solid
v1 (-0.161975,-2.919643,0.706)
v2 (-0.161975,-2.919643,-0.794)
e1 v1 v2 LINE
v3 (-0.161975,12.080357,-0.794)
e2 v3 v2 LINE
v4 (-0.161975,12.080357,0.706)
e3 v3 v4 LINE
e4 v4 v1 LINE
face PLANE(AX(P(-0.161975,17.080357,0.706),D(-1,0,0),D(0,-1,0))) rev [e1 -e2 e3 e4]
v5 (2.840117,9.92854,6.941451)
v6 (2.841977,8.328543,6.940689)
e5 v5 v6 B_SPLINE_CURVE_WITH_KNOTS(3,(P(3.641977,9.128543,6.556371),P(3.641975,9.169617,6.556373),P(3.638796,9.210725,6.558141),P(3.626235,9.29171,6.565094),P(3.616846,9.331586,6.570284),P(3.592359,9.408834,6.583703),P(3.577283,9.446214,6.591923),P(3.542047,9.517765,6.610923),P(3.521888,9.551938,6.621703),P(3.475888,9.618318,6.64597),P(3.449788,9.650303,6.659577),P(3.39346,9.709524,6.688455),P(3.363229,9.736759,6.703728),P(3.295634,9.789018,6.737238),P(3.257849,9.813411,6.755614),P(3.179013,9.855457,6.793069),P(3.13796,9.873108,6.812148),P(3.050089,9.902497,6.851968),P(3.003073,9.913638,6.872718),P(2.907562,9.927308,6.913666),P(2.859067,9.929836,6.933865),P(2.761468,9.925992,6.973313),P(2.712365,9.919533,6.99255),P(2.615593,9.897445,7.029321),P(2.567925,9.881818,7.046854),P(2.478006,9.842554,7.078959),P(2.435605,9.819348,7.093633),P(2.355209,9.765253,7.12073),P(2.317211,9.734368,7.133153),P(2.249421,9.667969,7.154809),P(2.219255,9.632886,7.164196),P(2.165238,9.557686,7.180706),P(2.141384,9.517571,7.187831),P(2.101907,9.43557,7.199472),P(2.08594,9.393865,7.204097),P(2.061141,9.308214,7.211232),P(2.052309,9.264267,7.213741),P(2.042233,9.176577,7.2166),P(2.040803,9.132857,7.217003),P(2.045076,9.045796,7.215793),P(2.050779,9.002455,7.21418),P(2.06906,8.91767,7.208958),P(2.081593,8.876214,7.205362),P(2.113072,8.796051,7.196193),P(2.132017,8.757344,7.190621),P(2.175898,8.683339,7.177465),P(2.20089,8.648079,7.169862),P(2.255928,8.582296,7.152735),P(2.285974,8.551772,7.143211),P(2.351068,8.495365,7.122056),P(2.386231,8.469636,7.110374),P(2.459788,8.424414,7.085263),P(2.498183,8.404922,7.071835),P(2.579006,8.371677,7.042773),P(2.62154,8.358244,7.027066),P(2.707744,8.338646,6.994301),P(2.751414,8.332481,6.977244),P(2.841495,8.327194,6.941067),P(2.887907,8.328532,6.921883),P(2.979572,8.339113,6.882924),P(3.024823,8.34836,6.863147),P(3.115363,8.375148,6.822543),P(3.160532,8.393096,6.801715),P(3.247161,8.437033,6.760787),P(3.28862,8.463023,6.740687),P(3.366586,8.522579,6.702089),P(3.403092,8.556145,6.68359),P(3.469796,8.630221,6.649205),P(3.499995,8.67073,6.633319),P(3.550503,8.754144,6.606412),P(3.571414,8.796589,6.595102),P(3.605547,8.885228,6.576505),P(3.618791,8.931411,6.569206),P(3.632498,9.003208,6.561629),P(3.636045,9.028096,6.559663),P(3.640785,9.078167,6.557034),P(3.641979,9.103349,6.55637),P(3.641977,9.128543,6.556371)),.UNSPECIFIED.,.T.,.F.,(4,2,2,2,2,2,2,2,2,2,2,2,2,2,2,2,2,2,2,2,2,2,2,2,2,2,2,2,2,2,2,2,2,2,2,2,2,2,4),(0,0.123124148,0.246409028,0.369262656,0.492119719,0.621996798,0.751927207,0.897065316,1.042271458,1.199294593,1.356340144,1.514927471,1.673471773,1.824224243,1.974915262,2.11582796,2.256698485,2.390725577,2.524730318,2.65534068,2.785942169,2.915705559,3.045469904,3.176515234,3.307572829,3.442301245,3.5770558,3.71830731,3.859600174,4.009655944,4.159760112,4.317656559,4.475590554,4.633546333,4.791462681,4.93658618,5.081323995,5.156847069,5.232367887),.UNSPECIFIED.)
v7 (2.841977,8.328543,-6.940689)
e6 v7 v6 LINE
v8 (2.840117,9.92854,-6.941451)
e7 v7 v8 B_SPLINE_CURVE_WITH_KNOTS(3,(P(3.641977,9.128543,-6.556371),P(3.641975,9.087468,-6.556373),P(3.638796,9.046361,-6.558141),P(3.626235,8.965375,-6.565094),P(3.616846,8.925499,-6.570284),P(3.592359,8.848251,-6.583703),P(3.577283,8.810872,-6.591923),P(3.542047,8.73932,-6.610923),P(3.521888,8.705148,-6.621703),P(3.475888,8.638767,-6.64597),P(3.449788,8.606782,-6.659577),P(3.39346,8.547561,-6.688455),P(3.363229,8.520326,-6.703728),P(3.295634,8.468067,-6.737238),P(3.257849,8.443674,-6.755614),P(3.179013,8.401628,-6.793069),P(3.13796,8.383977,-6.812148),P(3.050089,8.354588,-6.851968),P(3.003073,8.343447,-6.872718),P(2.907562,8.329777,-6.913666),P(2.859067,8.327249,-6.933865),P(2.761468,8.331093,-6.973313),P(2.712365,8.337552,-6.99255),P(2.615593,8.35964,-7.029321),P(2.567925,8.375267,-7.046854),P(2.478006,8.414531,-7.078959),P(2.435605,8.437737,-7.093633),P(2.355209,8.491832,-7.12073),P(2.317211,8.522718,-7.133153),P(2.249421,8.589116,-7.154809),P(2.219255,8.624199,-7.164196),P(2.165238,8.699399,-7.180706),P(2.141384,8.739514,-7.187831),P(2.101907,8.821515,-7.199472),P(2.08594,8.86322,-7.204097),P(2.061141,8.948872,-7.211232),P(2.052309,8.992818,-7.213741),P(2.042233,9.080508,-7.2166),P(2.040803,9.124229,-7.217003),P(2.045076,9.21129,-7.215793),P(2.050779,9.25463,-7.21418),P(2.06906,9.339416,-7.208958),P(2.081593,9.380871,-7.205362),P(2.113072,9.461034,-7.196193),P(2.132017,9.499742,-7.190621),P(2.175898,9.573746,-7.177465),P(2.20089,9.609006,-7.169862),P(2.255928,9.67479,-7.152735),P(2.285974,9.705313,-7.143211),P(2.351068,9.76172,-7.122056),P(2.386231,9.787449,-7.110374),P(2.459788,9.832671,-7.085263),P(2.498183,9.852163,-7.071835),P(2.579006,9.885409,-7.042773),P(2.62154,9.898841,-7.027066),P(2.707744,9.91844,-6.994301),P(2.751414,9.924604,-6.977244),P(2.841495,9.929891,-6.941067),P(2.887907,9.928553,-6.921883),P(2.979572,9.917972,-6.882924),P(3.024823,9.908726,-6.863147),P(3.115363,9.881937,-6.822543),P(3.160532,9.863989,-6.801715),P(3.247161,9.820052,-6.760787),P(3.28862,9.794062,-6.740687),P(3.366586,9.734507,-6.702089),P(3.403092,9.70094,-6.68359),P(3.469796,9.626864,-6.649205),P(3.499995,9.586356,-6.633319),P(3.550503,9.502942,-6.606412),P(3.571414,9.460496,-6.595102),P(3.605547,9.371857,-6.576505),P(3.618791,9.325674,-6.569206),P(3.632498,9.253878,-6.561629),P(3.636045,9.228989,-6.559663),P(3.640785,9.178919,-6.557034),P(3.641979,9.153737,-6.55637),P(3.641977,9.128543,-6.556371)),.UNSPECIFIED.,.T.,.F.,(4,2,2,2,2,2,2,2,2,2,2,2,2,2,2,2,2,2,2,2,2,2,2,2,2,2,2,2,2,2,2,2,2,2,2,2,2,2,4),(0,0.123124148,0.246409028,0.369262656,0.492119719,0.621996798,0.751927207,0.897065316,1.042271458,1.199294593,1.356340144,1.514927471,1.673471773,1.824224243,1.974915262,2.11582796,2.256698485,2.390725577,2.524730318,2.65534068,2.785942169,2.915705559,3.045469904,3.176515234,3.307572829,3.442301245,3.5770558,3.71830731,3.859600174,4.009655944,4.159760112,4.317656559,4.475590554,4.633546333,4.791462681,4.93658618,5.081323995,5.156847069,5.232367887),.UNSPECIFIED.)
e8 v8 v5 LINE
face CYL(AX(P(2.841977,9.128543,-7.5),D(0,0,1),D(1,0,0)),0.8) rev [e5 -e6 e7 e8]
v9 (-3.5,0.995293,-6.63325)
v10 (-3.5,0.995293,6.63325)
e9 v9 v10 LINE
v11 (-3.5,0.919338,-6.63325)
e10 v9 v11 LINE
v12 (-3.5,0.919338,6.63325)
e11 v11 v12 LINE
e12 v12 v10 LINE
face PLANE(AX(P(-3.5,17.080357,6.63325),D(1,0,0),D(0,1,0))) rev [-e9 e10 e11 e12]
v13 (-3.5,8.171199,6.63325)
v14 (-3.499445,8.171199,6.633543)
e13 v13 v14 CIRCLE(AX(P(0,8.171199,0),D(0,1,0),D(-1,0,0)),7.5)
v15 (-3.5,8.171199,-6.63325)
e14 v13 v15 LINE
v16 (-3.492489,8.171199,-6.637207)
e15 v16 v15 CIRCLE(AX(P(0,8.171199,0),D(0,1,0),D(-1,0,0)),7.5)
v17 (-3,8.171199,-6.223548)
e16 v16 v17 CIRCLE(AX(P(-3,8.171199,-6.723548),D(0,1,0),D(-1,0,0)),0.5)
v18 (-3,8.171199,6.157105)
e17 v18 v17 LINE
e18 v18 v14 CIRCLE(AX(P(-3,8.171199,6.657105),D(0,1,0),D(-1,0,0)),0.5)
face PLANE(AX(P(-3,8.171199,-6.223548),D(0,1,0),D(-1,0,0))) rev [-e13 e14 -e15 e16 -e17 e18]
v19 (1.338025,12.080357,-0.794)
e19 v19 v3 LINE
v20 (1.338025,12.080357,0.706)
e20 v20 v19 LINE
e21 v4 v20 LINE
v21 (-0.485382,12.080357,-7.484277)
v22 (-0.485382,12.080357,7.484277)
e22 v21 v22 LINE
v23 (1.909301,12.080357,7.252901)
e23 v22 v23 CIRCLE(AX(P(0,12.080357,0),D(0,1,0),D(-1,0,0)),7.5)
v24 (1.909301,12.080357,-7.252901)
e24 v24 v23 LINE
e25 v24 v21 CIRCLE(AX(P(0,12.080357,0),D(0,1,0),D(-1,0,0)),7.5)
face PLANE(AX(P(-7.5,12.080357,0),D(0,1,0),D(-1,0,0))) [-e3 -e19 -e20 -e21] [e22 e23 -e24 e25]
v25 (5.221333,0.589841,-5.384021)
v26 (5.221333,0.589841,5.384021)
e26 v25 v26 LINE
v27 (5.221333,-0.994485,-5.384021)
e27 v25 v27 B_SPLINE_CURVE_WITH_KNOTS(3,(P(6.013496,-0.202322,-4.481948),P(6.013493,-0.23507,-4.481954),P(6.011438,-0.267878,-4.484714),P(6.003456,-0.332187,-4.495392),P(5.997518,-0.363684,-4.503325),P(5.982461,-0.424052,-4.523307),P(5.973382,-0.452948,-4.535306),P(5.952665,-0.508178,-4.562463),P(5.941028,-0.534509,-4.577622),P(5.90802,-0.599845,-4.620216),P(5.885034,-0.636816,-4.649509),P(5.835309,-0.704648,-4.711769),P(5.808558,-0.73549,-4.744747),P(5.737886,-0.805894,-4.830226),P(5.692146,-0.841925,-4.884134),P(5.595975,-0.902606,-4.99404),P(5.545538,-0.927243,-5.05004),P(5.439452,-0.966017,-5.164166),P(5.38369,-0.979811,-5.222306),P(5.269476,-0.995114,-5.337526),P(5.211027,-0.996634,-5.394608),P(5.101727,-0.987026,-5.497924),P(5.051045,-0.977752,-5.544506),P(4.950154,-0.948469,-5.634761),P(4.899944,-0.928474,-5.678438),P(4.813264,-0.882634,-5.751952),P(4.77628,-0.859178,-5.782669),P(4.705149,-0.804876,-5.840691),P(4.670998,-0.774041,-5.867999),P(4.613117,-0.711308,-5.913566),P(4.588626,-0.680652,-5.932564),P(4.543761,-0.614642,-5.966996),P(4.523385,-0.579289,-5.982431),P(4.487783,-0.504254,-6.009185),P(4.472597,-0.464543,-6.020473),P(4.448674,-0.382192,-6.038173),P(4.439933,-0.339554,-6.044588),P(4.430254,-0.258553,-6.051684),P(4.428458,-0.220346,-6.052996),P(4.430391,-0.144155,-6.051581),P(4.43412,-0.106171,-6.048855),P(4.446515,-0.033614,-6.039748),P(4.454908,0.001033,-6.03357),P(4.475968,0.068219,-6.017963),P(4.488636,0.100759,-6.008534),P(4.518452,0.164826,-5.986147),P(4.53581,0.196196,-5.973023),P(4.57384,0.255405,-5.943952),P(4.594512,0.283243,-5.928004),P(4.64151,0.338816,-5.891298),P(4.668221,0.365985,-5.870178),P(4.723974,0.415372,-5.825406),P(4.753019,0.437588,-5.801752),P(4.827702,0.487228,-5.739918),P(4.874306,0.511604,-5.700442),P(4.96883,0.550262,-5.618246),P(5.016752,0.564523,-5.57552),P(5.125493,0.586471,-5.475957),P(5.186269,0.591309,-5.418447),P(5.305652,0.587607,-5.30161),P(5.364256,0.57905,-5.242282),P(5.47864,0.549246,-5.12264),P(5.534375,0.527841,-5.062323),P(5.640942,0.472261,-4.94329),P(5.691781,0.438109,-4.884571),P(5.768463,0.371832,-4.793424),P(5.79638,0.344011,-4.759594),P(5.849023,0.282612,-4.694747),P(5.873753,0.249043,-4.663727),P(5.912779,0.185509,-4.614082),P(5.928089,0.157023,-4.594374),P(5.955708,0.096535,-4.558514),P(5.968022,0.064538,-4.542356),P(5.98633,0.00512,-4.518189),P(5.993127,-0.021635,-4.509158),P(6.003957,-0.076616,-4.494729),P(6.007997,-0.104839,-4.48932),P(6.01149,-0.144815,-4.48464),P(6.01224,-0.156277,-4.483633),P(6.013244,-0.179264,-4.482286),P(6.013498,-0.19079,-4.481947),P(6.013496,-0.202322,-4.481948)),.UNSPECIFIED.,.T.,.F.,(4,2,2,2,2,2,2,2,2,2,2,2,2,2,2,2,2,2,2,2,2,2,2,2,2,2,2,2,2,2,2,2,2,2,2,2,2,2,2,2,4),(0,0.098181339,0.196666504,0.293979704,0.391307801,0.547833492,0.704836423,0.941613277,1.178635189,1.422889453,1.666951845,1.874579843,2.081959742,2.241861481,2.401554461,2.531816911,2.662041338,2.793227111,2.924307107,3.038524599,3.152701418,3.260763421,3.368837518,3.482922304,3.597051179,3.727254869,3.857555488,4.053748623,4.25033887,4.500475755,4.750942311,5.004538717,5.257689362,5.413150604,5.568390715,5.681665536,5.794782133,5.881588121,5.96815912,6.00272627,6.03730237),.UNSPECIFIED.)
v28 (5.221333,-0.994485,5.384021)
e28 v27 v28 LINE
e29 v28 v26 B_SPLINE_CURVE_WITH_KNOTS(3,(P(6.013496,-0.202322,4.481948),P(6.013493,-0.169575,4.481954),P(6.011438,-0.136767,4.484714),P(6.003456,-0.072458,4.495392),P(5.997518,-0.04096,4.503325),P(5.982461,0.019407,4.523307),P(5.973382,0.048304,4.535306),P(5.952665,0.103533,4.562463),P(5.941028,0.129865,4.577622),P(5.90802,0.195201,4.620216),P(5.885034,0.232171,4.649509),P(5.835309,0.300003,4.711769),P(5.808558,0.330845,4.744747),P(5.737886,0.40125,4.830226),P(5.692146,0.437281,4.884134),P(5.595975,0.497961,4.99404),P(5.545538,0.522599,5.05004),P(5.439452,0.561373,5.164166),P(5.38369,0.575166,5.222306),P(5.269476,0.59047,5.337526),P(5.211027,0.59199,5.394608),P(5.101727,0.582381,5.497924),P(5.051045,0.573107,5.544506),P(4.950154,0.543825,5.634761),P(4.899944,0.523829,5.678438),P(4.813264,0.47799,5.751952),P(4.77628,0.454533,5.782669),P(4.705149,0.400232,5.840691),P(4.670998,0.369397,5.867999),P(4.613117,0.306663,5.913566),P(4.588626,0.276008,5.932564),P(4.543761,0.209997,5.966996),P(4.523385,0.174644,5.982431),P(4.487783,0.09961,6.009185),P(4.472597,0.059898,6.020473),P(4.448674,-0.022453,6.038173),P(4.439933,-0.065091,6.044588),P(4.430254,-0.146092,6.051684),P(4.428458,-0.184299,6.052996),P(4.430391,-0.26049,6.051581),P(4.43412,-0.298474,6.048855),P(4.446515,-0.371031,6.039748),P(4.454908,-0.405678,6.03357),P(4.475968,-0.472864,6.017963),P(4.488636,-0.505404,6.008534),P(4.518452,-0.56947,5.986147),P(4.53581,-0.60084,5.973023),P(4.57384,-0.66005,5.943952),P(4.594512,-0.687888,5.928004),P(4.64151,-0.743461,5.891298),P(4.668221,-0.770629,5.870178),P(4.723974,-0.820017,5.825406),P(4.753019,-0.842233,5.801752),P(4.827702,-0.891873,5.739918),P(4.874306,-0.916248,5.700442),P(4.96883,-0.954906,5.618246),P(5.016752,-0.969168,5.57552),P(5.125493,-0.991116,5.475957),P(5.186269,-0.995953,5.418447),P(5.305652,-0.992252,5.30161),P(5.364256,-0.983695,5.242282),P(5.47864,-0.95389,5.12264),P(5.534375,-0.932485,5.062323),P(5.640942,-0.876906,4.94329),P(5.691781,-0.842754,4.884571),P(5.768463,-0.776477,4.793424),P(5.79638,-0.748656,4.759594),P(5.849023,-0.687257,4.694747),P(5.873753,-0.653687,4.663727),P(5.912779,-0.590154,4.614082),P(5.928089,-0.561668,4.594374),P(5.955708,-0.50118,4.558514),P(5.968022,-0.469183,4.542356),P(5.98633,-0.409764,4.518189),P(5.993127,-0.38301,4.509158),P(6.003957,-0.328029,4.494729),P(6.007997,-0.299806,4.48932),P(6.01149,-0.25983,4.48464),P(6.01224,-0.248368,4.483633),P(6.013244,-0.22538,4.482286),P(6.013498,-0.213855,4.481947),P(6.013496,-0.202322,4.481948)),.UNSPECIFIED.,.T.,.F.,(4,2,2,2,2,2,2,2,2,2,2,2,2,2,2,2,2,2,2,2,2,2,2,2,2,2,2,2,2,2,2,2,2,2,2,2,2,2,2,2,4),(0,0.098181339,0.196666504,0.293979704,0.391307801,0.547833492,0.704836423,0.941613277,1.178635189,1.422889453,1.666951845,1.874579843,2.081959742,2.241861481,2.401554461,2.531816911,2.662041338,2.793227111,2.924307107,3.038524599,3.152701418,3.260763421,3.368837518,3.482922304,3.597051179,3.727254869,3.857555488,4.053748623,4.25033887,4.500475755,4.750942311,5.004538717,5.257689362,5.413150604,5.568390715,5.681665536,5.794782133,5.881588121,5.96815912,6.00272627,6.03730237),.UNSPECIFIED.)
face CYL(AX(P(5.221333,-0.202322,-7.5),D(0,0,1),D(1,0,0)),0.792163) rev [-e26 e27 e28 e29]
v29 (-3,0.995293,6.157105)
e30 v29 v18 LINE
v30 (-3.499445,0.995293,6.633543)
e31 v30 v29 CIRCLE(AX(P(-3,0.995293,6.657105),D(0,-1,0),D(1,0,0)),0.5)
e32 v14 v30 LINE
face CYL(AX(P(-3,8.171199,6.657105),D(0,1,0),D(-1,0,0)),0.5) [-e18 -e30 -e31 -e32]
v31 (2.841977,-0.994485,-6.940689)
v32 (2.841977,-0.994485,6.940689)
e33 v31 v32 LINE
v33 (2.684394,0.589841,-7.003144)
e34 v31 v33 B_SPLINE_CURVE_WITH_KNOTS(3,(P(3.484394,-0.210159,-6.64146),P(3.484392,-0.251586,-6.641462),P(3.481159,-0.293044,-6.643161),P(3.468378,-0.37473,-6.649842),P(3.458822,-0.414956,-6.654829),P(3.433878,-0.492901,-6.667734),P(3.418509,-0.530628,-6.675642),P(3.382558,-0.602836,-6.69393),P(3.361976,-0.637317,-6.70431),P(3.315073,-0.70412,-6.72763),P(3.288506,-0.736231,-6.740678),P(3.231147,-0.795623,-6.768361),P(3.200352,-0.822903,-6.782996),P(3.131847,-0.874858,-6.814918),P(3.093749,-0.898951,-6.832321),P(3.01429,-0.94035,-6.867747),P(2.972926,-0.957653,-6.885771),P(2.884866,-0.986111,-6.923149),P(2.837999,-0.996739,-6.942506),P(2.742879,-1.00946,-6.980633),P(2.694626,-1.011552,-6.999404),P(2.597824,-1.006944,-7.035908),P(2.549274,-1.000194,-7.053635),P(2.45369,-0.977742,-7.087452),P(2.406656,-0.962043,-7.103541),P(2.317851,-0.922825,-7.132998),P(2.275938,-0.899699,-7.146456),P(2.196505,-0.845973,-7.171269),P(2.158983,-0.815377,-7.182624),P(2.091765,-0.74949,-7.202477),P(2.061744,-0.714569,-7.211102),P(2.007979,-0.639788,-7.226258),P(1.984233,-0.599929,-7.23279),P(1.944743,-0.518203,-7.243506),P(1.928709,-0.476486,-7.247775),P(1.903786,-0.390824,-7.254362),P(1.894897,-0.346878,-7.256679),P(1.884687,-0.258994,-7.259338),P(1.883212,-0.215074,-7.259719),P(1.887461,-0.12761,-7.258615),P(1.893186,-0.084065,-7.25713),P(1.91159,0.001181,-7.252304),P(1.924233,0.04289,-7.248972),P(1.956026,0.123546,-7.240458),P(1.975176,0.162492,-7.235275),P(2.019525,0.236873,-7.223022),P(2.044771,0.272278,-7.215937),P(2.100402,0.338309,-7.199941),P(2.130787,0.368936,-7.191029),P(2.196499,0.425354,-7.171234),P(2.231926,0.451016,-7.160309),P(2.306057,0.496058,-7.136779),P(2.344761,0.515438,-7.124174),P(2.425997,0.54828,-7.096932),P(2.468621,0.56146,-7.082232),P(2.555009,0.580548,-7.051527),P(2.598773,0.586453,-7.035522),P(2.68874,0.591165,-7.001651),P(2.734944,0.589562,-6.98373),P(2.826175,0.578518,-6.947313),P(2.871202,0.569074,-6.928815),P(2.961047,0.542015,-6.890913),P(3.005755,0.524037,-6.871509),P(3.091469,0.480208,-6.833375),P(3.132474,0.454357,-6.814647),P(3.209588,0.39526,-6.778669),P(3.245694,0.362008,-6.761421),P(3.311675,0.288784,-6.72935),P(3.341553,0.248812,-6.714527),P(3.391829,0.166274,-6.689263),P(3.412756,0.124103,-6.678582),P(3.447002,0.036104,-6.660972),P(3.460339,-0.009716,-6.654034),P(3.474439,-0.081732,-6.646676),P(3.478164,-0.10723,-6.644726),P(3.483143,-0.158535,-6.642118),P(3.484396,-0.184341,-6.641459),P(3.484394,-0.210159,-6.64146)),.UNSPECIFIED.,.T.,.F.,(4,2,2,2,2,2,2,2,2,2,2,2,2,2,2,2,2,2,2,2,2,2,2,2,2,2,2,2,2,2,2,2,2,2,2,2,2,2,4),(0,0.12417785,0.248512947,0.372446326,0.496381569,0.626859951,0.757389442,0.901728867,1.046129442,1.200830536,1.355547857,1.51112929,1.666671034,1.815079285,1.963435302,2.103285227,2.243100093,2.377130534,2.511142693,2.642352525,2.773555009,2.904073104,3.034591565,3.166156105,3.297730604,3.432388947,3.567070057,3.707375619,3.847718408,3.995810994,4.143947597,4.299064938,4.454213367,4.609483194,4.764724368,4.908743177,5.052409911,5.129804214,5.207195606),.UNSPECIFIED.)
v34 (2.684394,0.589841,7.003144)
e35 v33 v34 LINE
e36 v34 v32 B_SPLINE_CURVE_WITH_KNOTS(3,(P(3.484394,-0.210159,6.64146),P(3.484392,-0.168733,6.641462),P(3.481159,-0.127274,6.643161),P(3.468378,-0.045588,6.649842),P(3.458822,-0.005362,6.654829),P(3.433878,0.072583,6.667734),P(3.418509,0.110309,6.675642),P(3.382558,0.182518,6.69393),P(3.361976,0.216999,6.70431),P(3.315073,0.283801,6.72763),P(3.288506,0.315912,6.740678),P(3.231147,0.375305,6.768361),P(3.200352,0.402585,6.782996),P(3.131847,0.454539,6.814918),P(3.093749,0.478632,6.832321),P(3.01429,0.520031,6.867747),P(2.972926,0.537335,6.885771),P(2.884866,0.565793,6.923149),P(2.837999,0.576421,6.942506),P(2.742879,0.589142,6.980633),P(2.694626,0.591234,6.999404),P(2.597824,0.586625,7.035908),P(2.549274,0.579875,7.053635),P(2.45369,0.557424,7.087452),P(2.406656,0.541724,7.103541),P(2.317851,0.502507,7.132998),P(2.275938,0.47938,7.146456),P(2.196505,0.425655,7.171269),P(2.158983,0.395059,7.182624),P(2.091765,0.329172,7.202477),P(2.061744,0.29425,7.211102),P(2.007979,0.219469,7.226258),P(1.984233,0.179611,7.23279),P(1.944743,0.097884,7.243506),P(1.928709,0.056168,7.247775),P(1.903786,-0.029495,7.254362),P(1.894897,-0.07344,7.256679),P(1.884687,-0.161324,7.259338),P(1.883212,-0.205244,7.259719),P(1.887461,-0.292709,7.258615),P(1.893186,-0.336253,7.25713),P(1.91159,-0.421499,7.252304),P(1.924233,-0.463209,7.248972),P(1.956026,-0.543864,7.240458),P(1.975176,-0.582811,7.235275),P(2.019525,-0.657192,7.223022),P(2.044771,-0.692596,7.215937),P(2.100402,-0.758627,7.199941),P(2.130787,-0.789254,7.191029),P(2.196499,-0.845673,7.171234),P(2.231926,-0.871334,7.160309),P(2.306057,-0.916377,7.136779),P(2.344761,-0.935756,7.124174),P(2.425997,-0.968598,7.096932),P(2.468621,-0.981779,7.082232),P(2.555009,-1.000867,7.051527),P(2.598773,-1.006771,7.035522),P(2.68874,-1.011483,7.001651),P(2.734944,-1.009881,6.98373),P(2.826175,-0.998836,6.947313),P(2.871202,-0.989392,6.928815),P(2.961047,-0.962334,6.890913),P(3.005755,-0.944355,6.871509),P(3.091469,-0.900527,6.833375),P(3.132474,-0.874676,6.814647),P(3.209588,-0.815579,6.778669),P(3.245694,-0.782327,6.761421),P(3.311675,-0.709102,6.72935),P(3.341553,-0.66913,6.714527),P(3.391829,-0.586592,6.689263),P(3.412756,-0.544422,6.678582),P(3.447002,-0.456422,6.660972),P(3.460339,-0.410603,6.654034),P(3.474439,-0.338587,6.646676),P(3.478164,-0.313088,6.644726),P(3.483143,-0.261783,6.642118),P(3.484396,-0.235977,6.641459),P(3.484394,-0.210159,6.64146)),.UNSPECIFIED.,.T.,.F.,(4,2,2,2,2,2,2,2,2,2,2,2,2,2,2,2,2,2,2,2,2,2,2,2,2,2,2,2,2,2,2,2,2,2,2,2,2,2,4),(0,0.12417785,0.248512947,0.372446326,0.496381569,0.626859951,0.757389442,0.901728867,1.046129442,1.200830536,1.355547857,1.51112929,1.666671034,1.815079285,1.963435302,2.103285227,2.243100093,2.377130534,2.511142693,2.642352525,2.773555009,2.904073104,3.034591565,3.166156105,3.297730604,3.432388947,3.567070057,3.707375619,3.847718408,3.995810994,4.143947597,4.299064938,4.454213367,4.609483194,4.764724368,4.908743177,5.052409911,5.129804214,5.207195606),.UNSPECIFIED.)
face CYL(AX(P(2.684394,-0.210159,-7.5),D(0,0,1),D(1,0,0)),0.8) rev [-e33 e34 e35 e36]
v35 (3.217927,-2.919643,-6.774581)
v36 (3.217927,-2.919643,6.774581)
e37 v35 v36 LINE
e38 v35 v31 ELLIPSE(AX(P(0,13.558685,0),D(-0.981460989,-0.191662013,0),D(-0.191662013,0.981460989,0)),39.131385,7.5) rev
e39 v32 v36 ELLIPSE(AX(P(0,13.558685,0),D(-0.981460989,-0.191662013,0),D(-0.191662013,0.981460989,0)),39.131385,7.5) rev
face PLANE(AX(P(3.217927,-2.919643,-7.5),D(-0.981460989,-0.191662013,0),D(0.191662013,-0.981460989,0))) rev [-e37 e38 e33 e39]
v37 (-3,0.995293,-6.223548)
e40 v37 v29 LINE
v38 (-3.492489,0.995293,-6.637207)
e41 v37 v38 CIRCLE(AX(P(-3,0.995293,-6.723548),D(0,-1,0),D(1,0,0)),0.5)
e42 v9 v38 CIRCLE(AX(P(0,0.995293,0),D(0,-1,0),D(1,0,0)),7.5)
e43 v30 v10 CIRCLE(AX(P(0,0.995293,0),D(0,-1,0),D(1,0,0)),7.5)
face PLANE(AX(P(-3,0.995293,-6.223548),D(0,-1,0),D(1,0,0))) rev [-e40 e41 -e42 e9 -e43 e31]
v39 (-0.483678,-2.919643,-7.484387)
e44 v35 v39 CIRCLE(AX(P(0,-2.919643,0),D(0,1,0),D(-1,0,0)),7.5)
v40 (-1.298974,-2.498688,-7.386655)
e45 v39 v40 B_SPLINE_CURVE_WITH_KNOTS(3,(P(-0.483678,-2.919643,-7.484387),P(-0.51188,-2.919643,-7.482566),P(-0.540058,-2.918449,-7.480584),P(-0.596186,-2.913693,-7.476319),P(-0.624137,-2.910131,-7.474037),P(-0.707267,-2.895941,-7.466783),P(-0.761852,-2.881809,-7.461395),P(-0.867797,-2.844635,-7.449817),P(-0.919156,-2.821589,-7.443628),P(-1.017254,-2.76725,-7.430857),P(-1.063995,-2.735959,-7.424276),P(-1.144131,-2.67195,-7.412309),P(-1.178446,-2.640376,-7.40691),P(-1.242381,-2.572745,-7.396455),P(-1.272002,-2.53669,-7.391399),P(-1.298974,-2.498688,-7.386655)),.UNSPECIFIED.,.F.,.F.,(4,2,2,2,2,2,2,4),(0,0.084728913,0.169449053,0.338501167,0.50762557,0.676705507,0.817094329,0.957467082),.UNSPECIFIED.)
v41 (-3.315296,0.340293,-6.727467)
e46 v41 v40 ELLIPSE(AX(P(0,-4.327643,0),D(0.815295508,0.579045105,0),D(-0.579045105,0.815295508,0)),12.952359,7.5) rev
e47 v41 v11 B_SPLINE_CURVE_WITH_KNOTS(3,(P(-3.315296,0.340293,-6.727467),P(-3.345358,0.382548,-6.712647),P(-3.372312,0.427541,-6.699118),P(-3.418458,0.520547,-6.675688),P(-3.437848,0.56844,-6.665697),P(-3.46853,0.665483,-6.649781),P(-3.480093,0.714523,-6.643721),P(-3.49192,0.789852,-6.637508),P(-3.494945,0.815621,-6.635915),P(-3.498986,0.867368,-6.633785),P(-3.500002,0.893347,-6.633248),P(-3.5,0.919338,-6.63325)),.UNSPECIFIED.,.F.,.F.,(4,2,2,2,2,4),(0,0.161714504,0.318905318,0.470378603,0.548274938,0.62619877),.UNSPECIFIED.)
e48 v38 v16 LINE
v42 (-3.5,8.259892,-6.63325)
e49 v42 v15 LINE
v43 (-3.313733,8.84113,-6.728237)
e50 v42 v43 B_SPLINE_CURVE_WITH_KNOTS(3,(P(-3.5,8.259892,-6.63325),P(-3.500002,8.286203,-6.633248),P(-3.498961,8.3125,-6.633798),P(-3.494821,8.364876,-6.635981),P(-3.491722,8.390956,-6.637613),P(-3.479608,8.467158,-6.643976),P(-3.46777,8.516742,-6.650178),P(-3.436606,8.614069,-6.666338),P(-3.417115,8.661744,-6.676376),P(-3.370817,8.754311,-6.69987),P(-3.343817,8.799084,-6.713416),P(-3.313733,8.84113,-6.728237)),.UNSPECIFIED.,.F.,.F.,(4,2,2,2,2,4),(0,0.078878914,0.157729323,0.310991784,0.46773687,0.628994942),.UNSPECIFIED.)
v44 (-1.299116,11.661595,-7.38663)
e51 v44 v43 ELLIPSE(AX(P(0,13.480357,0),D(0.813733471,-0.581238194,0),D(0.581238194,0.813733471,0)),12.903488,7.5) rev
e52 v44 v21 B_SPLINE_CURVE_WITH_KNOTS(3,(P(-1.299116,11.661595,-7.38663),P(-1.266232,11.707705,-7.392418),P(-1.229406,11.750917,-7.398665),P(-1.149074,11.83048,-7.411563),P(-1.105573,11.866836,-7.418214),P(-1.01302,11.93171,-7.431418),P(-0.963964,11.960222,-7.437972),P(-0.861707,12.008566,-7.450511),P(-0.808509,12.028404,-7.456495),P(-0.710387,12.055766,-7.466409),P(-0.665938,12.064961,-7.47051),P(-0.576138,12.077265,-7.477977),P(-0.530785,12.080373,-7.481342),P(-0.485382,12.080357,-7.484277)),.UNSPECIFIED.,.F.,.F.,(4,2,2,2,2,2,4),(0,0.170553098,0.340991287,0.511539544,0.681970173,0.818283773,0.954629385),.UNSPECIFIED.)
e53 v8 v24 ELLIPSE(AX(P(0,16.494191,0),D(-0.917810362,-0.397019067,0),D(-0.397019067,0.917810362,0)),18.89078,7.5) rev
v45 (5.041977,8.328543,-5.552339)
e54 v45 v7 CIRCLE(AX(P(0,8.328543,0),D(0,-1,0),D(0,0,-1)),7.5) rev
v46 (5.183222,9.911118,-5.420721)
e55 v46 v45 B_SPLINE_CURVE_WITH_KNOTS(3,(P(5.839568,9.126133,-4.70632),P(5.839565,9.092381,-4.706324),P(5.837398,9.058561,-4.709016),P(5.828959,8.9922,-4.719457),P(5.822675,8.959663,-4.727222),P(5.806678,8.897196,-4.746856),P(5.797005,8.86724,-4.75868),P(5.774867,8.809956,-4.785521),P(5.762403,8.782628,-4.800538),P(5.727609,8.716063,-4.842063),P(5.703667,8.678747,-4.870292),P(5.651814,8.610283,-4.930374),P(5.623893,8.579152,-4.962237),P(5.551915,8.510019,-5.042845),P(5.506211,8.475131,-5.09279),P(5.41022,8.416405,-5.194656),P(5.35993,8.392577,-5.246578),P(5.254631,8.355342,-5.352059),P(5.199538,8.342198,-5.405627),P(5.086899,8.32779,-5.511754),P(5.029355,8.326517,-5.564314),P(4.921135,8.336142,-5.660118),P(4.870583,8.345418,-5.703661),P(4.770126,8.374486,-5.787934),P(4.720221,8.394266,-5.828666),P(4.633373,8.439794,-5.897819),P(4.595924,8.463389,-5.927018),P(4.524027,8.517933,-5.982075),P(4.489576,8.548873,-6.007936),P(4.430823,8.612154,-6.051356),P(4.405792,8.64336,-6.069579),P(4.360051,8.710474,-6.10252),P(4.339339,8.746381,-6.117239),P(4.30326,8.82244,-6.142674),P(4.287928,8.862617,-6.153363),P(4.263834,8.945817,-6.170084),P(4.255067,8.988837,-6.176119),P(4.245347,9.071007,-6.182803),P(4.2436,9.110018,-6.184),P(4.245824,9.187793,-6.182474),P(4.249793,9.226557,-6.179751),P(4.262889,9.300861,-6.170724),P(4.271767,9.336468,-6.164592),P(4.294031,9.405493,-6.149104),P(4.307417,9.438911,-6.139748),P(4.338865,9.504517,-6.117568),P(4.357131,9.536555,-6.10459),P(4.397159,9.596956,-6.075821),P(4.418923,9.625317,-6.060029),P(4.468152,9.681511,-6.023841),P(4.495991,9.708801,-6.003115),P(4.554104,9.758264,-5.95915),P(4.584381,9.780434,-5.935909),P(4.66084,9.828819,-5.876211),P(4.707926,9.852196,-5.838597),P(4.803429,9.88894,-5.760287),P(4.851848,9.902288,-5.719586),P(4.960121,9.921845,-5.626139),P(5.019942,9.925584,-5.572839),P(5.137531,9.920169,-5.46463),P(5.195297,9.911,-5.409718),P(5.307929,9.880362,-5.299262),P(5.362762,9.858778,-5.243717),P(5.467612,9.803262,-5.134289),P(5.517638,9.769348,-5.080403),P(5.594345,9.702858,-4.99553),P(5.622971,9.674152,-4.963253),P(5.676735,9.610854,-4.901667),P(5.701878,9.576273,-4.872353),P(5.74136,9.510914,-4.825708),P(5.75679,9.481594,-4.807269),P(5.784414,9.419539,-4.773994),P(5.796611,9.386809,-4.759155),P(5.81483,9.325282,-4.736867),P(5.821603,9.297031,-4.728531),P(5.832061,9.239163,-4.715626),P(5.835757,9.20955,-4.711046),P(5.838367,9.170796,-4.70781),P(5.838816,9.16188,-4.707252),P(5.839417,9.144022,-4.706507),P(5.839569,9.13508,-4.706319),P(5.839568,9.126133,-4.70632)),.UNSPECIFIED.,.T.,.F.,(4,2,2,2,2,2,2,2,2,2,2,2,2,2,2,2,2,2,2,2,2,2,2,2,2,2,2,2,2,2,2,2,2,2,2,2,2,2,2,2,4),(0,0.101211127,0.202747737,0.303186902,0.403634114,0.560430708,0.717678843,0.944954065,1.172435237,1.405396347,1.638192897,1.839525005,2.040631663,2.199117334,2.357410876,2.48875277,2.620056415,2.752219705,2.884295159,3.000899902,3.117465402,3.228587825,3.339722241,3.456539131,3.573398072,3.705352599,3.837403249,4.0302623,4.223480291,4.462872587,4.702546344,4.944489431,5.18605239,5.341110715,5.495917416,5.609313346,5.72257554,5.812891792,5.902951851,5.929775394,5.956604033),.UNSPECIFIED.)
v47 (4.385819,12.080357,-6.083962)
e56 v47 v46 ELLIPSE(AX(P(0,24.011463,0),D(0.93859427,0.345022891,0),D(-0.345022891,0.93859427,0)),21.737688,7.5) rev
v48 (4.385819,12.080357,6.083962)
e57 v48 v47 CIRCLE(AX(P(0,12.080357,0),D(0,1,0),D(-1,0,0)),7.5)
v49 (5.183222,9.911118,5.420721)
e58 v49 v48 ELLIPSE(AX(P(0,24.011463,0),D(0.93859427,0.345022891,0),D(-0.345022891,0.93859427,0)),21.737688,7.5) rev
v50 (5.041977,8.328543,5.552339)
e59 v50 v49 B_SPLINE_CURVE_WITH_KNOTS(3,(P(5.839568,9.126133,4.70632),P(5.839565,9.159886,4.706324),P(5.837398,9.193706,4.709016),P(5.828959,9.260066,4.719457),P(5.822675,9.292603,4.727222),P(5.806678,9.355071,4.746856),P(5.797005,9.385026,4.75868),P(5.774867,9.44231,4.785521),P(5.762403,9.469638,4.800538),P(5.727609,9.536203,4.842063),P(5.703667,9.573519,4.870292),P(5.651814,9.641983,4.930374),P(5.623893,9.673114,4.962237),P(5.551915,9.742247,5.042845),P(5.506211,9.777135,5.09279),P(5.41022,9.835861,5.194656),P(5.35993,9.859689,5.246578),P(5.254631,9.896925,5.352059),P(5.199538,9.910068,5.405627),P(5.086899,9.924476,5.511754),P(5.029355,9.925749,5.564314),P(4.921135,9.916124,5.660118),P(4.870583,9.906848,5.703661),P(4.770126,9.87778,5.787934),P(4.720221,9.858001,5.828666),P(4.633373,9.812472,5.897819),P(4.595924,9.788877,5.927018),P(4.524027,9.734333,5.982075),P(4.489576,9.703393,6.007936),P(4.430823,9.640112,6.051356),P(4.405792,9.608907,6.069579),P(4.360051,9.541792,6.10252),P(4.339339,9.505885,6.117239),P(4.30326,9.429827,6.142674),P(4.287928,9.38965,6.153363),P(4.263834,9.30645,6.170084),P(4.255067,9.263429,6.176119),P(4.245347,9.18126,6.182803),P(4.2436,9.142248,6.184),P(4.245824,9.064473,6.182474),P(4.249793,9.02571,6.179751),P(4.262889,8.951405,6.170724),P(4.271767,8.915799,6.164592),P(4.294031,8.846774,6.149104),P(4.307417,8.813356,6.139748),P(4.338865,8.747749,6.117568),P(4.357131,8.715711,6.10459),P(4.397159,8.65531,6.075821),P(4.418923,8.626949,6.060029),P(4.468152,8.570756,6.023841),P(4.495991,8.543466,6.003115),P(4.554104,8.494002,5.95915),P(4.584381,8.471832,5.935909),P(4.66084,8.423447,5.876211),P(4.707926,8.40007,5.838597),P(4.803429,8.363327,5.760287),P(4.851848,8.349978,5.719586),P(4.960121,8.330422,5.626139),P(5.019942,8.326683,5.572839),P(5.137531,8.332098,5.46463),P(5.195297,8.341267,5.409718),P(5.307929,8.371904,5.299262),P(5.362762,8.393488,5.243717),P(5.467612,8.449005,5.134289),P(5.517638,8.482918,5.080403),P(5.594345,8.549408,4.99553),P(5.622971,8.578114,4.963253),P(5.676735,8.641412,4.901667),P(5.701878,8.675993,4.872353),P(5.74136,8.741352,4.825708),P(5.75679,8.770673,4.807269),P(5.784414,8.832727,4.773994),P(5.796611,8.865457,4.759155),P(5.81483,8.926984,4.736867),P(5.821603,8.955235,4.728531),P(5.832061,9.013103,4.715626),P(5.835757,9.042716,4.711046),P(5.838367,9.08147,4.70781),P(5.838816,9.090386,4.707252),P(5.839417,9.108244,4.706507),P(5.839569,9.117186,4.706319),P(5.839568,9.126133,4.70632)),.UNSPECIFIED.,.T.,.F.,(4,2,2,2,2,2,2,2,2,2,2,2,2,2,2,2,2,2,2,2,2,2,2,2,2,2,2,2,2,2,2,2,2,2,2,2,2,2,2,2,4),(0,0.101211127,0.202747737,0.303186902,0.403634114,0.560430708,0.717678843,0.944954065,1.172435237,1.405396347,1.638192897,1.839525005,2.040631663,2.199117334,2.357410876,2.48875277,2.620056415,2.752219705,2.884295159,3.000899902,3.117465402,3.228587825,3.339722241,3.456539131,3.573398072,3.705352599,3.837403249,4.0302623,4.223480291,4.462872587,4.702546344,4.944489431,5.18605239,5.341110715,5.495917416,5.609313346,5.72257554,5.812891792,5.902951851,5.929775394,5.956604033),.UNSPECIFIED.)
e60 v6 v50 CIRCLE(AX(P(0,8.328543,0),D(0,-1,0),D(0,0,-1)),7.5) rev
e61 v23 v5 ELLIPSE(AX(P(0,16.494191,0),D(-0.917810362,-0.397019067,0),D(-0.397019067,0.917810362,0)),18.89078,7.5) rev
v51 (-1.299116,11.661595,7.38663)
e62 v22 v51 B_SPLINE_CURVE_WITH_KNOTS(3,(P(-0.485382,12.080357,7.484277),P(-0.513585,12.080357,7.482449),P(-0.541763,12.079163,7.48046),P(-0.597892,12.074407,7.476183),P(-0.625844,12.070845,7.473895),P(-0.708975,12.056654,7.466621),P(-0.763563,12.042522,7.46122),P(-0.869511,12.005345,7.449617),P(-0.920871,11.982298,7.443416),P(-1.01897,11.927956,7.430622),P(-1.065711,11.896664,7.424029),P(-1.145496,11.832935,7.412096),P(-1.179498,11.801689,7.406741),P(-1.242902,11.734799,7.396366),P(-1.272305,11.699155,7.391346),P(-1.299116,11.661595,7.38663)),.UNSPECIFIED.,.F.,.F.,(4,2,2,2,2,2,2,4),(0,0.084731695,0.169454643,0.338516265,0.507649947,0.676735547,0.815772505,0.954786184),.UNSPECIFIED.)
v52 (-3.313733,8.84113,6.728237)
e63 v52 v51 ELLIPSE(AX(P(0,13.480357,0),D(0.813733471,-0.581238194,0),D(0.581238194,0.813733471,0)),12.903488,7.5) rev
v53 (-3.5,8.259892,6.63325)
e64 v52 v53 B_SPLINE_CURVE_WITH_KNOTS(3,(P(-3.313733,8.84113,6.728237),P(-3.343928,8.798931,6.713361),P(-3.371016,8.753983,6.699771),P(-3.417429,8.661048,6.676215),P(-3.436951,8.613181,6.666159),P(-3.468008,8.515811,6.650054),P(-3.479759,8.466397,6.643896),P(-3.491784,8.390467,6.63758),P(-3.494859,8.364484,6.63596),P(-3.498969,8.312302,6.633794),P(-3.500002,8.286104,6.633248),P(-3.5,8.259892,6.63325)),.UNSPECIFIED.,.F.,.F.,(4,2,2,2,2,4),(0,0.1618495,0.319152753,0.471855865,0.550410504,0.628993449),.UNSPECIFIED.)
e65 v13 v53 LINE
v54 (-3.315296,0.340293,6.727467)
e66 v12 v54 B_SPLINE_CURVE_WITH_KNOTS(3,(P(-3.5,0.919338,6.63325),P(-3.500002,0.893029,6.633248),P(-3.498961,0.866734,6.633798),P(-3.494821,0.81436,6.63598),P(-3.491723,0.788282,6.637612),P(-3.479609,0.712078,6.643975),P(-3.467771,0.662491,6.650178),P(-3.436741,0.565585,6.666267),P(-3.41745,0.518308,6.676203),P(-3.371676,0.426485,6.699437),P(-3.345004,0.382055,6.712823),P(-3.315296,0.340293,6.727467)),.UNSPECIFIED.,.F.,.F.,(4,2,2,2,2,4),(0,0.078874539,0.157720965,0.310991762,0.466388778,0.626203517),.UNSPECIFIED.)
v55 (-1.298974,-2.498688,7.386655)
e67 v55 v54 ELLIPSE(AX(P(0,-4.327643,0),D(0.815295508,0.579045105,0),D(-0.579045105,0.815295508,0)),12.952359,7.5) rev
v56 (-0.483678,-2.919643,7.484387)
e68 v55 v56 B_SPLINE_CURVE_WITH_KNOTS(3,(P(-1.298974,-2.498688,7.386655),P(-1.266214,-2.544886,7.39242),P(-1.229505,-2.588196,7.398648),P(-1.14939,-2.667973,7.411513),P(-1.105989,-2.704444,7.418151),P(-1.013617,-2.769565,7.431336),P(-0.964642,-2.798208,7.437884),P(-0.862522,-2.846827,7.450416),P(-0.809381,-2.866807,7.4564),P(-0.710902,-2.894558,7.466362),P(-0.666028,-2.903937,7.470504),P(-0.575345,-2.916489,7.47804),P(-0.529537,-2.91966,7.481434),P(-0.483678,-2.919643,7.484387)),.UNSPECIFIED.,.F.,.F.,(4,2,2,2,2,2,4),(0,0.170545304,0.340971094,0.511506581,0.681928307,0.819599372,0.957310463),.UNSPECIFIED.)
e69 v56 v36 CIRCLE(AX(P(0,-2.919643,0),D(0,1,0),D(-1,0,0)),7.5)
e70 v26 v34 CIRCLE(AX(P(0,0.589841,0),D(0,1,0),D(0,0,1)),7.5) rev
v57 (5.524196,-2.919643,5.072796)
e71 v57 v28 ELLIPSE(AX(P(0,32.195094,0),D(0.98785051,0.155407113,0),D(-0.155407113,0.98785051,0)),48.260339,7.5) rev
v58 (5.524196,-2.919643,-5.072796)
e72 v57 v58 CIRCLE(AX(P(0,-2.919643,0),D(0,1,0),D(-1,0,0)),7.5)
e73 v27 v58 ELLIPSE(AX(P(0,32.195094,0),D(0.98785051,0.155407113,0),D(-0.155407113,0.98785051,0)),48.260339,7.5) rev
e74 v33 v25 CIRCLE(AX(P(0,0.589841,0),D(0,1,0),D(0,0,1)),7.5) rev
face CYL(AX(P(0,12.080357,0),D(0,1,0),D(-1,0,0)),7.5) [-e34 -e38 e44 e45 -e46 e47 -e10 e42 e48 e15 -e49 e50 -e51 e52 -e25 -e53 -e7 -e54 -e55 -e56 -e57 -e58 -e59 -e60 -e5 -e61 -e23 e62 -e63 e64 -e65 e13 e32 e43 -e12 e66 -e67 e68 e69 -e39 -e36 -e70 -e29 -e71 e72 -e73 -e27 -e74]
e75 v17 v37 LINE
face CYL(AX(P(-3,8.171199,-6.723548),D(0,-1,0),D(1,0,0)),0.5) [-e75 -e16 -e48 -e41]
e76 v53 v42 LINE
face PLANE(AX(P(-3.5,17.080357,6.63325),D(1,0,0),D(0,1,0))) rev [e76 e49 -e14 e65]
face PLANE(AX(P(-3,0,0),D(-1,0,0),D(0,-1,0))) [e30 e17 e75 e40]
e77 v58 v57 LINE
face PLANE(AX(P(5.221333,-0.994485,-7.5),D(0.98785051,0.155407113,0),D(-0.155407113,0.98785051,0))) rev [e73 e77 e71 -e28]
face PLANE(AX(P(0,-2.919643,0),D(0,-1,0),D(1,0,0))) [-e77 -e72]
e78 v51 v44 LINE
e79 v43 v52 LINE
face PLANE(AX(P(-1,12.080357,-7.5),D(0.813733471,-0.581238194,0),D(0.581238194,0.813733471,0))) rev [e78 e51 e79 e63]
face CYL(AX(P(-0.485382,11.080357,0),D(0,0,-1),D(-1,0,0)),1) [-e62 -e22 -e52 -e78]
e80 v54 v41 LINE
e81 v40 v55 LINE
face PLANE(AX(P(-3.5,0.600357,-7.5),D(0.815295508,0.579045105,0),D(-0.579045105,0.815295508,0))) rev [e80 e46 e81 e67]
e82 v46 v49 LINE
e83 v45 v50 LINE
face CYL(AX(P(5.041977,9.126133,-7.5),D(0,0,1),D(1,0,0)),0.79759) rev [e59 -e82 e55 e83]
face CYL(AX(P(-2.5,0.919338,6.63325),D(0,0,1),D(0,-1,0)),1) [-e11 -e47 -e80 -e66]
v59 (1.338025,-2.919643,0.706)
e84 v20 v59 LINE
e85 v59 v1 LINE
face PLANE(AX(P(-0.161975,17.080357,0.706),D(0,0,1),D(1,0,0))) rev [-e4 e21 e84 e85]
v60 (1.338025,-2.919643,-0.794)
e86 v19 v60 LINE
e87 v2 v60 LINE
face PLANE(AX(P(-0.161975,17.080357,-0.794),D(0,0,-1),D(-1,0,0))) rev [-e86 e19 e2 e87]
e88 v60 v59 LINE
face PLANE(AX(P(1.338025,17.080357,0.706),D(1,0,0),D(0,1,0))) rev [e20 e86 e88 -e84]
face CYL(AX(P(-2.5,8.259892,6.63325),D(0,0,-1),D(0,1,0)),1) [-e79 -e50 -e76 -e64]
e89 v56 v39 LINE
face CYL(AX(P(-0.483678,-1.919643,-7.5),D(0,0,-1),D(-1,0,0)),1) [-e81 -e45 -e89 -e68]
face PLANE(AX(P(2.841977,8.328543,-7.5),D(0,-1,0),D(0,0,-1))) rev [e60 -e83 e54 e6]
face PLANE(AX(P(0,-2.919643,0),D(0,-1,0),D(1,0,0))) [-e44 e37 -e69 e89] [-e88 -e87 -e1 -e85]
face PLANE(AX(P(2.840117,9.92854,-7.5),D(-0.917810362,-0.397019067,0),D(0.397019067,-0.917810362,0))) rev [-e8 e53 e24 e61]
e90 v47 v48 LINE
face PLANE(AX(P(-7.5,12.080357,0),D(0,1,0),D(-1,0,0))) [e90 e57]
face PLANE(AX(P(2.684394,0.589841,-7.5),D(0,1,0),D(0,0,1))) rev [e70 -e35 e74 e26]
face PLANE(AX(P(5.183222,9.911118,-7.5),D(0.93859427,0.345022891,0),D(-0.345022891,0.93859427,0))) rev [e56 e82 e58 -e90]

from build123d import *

# Parameters (mm, degrees)
SKETCH1_W               = 7.5
SKETCH1_H               = 15
CUT_EXTRUDE1_START      = -20
CUT_EXTRUDE1_DEPTH      = 20
SKETCH4_W               = 1.5
SKETCH4_H               = 1.5
CUT_EXTRUDE2_DEPTH      = 20
CUT_EXTRUDE3_DEPTH      = 17.075914552
CUT_EXTRUDE3_DEPTH_BACK = 17.075914552
CUT_EXTRUDE4_DEPTH      = 17.075914721
CUT_EXTRUDE4_DEPTH_BACK = 17.075914721
SKETCH8_W               = 12.380653288
SKETCH8_H               = 7.175906378
CUT_EXTRUDE5_DEPTH      = 0.5
FILLET2_R               = 1
FILLET5_R               = 0.5


with BuildPart() as part:
    # Sketch1 → Revolve1 (revolve)
    with BuildSketch(Plane.XY):
        with Locations((-3.75, 4.580357143)):
            Rectangle(SKETCH1_W, SKETCH1_H)
    revolve(axis=Axis((0, 12.080357143, 0), (0, -1, 0)))

    # Sketch2 → Cut-Extrude1 (cut)
    with BuildSketch(Plane.XZ.offset(2.919642857).offset(CUT_EXTRUDE1_START)):
        with BuildLine():
            Line((-3.5, 6.633249581), (-3.5, -6.633249581))
            ThreePointArc((-3.5, -6.633249581), (-7.5, 0), (-3.5, 6.633249581))
        make_face()
    extrude(amount=CUT_EXTRUDE1_DEPTH, mode=Mode.SUBTRACT)

    # Sketch4 → Cut-Extrude2 (cut)
    with BuildSketch(Plane.XZ.offset(2.919642857)):
        with Locations((0.588025285, -0.043999564)):
            Rectangle(SKETCH4_W, SKETCH4_H)
    extrude(amount=-CUT_EXTRUDE2_DEPTH, mode=Mode.SUBTRACT)

    # Sketch6 → Cut-Extrude3 (cut, two sides: drawn at the far end of the back side and taken through both)
    with BuildSketch(Plane.XY.offset(-CUT_EXTRUDE3_DEPTH_BACK)):
        with BuildLine():
            Line((2.684394406, 0.589840789), (5.221333223, 0.589840789))
            ThreePointArc((5.221333223, 0.589840789), (6.01349632, -0.202322309), (5.221333223, -0.994485407))
            Line((5.221333223, -0.994485407), (5.524196013, -2.919642857))
            Line((5.524196013, -2.919642857), (3.217926739, -2.919642857))
            Line((3.217926739, -2.919642857), (2.84197746, -0.994485407))
            ThreePointArc((2.84197746, -0.994485407), (2.755326831, -1.007008376), (2.667826658, -1.009987637))
            ThreePointArc((2.667826658, -1.009987637), (1.8844373, -0.201874894), (2.684394406, 0.589840789))
        make_face()
        with BuildLine():
            Line((2.84197746, 8.328542626), (5.04197746, 8.328542626))
            ThreePointArc((5.04197746, 8.328542626), (5.761372587, 8.781718764), (5.663273755, 9.626274613))
            ThreePointArc((5.663273755, 9.626274613), (5.448979722, 9.81206297), (5.183221531, 9.91111765))
            Line((5.183221531, 9.91111765), (4.385819176, 12.080357143))
            Line((4.385819176, 12.080357143), (1.90930103, 12.080357143))
            Line((1.90930103, 12.080357143), (2.840116682, 9.928540462))
            ThreePointArc((2.840116682, 9.928540462), (2.515101589, 9.858715321), (2.24652895, 9.662809481))
            ThreePointArc((2.24652895, 9.662809481), (2.111425106, 8.802516157), (2.84197746, 8.328542626))
        make_face()
    extrude(amount=CUT_EXTRUDE3_DEPTH + CUT_EXTRUDE3_DEPTH_BACK, mode=Mode.SUBTRACT)

    # Sketch7 → Cut-Extrude4 (cut, two sides: drawn at the far end of the back side and taken through both)
    with BuildSketch(Plane.XY.offset(-CUT_EXTRUDE4_DEPTH_BACK)):
        Polygon((-3.5, 0.600357143), (-3.5, -2.919642857), (-1, -2.919642857), align=None)
        Polygon((-3.5, 12.080357143), (-3.5, 8.580357143), (-1, 12.080357143), align=None)
    extrude(amount=CUT_EXTRUDE4_DEPTH + CUT_EXTRUDE4_DEPTH_BACK, mode=Mode.SUBTRACT)

    # Sketch8 → Cut-Extrude5 (cut)
    with BuildSketch(Plane.ZY.offset(3.5)):
        with Locations((-0.033221789, 4.583246246)):
            Rectangle(SKETCH8_W, SKETCH8_H)
    extrude(amount=-CUT_EXTRUDE5_DEPTH, mode=Mode.SUBTRACT)

    # Fillet2
    fillet2_edges = [part.edges().sort_by_distance(p)[0] for p in [
        (-1, 12.080357143, 0),
        (-3.5, 8.580357143, 0),
        (-1, -2.919642857, 0),
        (-3.5, 0.600357143, 0),
    ]]
    fillet(fillet2_edges, radius=FILLET2_R)

    # Fillet5
    # the kernel refuses this fillet: 0.5 mm, written as the material it takes off along each edge
    with BuildSketch(Plane(origin=(-3.5, 8.171199435, 6.157104855), x_dir=(0, 0, 1), z_dir=(0, -1, 0)), Plane(origin=(-3.5, 0.995293057, -6.223548433), x_dir=(0, 0, -1), z_dir=(0, 1, 0))) as fillet5_piece_1:
        with BuildLine():
            CenterArc((FILLET5_R, -FILLET5_R), FILLET5_R, 90, 90)
            Line((0, -FILLET5_R), (0, 0))
            Line((0, 0), (FILLET5_R, 0))
        make_face()
    extrude(amount=7.175906378, mode=Mode.SUBTRACT)


solid = part.part
